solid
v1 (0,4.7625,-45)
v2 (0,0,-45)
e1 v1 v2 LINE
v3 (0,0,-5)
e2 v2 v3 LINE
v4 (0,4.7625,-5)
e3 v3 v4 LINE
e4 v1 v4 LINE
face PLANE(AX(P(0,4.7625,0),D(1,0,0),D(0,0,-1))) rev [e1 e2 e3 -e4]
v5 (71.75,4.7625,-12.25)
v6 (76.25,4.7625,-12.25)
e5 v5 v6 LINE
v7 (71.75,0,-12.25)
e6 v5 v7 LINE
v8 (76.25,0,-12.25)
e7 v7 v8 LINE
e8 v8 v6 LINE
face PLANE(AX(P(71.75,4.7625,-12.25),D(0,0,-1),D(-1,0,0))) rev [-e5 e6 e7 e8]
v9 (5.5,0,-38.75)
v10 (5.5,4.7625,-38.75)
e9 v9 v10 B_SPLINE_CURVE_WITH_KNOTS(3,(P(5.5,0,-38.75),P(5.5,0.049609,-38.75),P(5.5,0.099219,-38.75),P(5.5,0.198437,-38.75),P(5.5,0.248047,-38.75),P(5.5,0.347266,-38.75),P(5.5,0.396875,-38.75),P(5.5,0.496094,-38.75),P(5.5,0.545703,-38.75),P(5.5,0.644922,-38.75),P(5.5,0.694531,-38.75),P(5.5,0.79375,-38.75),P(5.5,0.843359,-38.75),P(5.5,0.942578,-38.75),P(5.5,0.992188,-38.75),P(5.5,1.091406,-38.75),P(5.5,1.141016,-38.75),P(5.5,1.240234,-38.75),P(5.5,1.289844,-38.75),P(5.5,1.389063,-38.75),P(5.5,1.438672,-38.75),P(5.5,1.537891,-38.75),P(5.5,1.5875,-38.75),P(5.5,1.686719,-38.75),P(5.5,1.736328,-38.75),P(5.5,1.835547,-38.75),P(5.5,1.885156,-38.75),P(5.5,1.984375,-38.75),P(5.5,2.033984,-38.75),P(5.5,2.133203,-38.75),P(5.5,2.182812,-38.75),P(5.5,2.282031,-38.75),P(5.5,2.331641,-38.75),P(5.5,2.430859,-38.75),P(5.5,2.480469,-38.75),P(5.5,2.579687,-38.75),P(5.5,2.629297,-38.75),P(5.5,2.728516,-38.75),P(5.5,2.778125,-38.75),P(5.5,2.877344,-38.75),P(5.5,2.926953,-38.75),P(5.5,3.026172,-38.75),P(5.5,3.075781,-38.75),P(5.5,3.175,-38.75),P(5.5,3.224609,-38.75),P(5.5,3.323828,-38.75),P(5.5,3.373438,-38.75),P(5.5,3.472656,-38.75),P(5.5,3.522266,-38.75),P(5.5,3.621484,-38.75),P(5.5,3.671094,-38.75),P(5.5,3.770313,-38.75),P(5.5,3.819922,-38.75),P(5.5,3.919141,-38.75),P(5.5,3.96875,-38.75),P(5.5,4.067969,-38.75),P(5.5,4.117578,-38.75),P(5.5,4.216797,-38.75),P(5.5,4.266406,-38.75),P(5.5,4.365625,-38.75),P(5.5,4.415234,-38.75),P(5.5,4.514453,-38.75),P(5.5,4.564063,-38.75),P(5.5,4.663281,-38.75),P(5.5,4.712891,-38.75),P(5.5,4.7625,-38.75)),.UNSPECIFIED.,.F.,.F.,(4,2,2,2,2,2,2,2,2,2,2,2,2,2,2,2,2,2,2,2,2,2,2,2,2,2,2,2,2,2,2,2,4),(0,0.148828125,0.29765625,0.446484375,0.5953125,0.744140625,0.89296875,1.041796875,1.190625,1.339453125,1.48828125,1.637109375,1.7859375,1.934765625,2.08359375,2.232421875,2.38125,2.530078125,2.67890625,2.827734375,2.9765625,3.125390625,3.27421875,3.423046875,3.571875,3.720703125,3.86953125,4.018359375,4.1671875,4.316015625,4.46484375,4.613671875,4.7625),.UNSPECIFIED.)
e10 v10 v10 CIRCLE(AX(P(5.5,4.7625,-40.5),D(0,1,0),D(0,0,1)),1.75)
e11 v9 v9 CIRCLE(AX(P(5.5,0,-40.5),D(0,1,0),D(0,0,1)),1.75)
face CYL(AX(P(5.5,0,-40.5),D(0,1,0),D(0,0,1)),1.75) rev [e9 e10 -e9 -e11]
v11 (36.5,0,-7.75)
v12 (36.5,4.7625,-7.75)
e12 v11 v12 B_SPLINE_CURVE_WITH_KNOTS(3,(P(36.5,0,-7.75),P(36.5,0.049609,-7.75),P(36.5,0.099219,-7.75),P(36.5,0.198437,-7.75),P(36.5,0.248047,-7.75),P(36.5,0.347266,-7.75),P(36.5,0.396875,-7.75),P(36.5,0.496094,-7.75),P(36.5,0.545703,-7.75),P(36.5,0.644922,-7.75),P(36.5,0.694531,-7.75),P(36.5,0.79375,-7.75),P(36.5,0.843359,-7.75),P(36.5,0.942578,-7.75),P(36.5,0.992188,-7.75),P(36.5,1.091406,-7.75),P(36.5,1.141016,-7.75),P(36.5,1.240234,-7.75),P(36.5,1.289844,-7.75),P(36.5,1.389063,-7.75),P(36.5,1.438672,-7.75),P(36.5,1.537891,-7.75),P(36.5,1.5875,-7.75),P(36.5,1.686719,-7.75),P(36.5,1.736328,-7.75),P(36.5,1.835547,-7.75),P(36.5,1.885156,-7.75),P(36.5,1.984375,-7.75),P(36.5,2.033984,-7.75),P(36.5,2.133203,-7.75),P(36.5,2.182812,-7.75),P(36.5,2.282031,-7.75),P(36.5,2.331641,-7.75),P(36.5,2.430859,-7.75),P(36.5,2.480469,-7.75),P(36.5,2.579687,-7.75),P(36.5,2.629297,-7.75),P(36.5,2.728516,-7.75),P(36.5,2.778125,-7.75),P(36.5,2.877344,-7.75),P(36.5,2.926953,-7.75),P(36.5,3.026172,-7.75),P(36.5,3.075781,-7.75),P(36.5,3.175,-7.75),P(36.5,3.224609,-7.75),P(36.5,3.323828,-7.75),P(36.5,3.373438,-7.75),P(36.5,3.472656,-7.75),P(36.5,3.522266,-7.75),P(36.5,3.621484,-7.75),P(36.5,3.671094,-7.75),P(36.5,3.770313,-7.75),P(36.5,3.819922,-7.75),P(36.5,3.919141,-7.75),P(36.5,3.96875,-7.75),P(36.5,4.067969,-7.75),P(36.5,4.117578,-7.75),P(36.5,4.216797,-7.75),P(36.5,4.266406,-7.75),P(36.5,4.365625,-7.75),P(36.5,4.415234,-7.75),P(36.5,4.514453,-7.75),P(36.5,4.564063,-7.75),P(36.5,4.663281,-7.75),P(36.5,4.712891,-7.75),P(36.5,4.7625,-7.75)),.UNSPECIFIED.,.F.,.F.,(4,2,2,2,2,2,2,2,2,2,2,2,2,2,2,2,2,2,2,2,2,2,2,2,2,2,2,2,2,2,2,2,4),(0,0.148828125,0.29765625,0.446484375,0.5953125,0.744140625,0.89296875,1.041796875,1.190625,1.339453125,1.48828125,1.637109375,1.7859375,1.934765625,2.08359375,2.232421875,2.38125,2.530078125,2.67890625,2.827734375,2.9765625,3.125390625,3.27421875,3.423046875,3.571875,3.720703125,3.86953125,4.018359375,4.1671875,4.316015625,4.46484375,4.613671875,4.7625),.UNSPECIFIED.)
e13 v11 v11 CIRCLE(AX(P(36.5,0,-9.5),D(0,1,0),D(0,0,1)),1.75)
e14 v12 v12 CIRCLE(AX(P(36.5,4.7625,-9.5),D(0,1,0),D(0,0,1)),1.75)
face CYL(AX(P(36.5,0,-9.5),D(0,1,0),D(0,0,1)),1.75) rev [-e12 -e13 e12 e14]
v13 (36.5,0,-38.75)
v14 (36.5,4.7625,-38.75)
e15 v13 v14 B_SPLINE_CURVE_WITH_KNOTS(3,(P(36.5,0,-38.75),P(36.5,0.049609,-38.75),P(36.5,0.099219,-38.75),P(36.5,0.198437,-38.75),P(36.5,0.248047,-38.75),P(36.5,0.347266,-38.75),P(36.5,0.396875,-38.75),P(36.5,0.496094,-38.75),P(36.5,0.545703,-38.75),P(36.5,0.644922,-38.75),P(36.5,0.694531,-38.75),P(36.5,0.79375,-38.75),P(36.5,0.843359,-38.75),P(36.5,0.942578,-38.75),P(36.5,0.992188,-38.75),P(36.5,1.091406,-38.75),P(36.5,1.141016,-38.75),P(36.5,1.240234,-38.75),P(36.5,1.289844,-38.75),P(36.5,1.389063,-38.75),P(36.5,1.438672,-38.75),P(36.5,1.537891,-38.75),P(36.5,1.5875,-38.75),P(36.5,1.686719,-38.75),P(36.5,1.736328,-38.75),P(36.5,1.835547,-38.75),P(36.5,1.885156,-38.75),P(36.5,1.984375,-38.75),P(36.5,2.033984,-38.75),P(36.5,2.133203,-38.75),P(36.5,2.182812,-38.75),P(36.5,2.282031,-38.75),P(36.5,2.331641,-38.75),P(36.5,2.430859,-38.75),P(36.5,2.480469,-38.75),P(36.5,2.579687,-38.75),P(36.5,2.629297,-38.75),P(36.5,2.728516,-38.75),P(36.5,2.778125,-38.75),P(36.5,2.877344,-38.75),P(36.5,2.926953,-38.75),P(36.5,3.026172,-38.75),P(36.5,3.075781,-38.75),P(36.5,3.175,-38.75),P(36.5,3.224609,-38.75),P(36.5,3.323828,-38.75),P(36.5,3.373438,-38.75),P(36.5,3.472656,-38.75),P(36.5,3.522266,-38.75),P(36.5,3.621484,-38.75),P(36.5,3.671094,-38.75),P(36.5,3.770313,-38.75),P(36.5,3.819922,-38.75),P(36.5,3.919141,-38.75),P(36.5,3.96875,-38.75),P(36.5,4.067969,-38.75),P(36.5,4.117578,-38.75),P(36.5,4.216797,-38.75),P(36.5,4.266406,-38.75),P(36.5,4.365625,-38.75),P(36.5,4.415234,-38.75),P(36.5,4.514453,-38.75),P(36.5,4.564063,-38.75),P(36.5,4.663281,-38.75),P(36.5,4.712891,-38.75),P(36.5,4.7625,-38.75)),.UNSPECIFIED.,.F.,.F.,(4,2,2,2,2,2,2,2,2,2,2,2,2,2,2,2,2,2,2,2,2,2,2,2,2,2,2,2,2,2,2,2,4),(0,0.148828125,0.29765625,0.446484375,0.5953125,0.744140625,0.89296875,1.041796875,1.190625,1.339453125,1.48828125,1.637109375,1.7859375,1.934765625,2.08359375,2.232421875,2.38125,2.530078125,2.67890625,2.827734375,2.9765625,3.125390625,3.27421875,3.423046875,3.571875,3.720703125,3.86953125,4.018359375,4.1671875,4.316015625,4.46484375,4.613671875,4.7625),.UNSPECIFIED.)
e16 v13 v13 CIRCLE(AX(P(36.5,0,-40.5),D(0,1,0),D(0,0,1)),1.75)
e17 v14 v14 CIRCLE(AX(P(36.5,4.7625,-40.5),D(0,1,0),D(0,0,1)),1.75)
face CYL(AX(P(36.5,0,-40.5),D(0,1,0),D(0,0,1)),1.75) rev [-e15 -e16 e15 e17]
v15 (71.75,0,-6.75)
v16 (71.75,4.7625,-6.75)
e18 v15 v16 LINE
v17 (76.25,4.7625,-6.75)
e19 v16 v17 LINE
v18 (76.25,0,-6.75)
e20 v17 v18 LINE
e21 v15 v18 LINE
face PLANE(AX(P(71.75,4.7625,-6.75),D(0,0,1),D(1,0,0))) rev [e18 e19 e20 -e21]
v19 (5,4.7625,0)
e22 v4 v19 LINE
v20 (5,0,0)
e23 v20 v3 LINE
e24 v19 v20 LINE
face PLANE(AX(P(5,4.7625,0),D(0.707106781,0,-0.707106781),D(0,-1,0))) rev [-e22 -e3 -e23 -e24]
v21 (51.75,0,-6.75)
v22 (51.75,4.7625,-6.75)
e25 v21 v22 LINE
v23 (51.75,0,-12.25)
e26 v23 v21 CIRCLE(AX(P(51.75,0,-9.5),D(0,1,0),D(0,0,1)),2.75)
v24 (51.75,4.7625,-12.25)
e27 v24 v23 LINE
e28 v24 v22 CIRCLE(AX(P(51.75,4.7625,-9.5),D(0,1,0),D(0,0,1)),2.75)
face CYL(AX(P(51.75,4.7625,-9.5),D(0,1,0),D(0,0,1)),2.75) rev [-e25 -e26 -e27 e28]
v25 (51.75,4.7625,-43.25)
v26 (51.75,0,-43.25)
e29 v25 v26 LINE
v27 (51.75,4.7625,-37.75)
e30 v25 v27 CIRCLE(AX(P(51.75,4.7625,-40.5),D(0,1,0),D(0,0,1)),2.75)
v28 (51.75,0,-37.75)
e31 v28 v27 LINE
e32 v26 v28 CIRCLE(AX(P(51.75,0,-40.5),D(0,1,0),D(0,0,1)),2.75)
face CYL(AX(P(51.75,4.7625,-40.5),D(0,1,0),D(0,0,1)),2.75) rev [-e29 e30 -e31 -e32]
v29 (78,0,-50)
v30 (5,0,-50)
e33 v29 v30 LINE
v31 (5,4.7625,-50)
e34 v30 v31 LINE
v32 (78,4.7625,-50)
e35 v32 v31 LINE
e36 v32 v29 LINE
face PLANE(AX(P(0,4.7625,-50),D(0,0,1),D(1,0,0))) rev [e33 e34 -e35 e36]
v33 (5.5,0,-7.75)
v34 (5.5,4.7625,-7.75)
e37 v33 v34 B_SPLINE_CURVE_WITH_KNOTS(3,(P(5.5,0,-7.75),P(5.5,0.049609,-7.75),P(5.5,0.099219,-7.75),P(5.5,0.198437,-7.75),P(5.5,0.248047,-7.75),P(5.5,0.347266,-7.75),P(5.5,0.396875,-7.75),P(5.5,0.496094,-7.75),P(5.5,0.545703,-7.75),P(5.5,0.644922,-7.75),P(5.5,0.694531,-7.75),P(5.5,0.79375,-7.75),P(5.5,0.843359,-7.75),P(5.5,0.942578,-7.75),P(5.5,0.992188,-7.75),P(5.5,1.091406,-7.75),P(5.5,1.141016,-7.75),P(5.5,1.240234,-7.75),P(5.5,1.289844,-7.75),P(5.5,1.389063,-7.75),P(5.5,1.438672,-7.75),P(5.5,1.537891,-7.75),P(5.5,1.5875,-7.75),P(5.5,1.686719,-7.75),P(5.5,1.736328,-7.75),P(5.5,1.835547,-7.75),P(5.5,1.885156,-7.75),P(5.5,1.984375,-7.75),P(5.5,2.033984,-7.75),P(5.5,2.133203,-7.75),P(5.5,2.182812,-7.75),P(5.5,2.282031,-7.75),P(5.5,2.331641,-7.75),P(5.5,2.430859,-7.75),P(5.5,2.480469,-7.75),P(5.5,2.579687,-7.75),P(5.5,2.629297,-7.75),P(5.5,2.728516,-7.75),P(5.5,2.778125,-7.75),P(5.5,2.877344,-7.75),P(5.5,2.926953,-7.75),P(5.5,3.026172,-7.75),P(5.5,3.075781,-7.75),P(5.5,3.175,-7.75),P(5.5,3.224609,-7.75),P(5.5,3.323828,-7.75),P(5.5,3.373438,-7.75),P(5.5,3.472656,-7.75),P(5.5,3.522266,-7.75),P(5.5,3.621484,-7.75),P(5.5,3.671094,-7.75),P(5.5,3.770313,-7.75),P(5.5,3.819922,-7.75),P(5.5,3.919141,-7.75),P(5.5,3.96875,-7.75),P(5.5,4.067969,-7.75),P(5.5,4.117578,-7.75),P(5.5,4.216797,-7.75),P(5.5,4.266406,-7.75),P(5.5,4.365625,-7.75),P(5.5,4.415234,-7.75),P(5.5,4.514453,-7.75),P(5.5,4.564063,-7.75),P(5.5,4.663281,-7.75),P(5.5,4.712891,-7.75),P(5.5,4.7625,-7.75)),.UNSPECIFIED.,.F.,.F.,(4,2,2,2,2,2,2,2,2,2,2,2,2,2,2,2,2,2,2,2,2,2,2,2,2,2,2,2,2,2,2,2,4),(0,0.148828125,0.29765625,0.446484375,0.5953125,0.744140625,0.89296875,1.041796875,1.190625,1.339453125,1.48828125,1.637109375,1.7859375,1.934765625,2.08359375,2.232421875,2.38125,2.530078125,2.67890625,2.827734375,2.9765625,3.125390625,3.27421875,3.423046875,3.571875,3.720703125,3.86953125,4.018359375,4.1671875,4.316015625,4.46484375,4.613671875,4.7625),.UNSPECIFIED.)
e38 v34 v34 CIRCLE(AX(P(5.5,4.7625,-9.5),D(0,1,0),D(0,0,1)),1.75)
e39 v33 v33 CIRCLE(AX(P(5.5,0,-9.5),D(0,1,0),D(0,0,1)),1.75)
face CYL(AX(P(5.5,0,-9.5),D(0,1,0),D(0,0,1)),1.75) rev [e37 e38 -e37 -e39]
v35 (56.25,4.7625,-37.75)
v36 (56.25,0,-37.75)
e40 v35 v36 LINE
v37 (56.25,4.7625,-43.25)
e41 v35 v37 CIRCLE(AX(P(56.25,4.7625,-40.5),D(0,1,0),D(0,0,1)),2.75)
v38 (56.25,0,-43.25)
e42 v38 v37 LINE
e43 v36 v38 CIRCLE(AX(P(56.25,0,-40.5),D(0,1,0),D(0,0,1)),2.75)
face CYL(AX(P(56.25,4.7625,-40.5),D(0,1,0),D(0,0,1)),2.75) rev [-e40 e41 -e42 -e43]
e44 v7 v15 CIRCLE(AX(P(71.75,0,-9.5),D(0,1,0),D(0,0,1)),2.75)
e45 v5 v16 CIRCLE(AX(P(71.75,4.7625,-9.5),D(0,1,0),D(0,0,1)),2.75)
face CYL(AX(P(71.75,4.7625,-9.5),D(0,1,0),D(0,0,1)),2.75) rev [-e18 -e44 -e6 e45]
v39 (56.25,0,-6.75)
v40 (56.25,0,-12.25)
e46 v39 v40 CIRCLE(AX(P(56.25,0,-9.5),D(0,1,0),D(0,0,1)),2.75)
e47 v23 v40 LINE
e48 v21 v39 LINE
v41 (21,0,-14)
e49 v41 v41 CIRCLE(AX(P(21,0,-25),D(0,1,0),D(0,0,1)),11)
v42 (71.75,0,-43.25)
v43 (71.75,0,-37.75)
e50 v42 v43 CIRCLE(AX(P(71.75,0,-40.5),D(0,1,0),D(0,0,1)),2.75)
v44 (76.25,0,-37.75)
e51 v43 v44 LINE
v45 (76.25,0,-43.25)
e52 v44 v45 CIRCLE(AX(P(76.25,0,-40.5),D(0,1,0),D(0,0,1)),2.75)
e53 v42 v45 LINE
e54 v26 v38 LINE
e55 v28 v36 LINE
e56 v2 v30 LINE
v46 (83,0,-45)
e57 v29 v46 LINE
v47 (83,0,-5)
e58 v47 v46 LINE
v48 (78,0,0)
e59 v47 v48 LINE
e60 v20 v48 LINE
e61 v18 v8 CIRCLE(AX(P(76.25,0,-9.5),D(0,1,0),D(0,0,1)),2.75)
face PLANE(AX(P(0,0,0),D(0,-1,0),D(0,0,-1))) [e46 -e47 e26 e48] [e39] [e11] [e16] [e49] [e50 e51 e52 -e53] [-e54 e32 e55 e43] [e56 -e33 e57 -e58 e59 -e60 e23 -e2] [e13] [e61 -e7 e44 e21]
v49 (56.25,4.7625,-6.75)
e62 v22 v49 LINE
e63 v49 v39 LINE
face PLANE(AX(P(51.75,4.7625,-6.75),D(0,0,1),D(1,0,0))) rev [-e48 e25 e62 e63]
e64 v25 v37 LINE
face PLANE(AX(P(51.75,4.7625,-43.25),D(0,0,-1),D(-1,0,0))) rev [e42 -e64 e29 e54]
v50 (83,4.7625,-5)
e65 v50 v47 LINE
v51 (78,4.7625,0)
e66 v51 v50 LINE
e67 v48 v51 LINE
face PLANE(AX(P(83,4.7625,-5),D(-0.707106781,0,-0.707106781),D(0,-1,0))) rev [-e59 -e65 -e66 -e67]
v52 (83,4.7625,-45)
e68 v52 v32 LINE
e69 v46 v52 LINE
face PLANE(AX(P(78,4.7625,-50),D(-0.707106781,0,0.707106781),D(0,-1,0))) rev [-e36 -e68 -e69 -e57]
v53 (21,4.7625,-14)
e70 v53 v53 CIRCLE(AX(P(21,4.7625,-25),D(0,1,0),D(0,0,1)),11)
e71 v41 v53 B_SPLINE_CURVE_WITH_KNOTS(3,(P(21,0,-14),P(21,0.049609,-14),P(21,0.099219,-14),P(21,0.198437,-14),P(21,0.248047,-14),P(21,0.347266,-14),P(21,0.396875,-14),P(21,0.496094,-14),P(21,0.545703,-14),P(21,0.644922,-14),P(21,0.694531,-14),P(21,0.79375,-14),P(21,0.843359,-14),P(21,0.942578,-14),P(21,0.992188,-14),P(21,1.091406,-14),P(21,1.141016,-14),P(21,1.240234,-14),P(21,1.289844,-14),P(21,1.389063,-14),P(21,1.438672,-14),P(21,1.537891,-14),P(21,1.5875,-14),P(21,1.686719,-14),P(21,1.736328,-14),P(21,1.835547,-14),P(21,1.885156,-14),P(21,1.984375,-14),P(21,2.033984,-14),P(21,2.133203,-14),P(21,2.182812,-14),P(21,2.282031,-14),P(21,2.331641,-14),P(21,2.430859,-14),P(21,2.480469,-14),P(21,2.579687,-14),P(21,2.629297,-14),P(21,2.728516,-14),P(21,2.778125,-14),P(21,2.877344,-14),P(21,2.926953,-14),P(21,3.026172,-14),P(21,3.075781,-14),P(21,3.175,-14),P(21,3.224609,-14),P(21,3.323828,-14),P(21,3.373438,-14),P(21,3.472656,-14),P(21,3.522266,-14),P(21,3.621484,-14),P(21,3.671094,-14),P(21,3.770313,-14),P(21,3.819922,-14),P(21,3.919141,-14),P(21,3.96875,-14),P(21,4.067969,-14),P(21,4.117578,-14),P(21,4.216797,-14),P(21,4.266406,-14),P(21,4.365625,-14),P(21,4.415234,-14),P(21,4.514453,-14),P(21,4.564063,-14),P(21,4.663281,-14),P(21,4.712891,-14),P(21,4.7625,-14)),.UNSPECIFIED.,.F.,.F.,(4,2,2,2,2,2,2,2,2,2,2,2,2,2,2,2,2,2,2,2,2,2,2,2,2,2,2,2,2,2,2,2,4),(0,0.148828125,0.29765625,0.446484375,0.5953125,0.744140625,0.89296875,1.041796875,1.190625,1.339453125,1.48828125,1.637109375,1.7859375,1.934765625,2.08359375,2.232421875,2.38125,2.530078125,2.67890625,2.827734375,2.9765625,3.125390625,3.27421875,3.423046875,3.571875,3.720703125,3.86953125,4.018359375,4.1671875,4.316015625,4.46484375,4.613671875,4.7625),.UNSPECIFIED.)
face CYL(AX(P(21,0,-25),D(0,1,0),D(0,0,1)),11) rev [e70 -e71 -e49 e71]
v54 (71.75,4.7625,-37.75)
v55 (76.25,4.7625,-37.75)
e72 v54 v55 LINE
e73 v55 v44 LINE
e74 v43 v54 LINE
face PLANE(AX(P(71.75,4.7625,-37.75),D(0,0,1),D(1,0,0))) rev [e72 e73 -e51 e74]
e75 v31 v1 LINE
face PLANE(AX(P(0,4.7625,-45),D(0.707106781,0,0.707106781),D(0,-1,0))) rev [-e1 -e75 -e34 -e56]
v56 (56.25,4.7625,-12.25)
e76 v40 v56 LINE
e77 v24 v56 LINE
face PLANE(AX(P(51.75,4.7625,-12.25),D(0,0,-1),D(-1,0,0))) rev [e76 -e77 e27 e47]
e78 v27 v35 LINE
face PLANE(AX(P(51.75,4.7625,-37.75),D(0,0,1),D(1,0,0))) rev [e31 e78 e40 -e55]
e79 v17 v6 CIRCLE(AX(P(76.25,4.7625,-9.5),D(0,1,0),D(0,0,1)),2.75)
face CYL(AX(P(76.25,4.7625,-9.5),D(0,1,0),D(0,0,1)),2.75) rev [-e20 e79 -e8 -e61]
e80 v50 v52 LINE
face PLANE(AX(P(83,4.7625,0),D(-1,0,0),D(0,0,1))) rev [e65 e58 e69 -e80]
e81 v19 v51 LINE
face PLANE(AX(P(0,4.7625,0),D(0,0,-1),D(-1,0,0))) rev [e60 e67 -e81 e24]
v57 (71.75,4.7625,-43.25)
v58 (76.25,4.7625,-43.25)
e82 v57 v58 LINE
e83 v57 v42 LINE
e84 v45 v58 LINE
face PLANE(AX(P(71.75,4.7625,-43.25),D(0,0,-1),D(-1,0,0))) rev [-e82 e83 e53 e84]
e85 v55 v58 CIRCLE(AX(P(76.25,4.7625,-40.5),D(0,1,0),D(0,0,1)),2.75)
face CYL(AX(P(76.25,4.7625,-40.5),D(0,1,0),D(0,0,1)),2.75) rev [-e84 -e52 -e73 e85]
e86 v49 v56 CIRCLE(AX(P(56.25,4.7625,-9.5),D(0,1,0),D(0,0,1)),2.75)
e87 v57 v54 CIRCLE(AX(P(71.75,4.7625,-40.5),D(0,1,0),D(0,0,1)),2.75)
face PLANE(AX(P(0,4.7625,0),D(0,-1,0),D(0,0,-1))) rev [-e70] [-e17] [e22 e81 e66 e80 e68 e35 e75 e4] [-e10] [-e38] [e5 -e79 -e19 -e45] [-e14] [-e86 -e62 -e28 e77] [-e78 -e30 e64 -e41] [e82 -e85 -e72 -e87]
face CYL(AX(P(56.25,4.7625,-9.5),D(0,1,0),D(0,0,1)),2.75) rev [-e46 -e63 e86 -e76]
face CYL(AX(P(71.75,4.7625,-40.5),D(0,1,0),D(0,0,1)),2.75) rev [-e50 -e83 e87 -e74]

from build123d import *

# Parameters (mm, degrees)
SKETCH1_W                = 83
SKETCH1_H                = 50
BOSS_EXTRUDE1_DEPTH      = 4.7625
SKETCH2_R                = 11
SKETCH2_R_2              = 1.75
CUT_EXTRUDE1_DEPTH       = 98.013820697
CHAMFER1_SIZE            = 5
M5_CLEARANCE_SLOT1_DEPTH = 4.7625


# Read off the part's stored shape, not the designer's step: M5 Clearance Slot1
with BuildPart() as part:
    # Sketch1 → Boss-Extrude1 (new body)
    with BuildSketch(Plane(origin=(0, 0, 0), x_dir=(1, 0, 0), z_dir=(0, 1, 0))):
        with Locations((41.5, 25)):
            Rectangle(SKETCH1_W, SKETCH1_H)
    extrude(amount=BOSS_EXTRUDE1_DEPTH)

    # Sketch2 → Cut-Extrude1 (cut, through all)
    with BuildSketch(Plane(origin=(0, 4.7625, 0), x_dir=(1, 0, 0), z_dir=(0, 1, 0))):
        with Locations(Location((21, 25, 0), (0, 0, 270))):
            Circle(SKETCH2_R)
        with Locations(Location((5.5, 9.5, 0), (0, 0, 270))):
            Circle(SKETCH2_R_2)
        with Locations(Location((36.5, 9.5, 0), (0, 0, 270))):
            Circle(SKETCH2_R_2)
        with Locations(Location((36.5, 40.5, 0), (0, 0, 270))):
            Circle(SKETCH2_R_2)
        with Locations(Location((5.5, 40.5, 0), (0, 0, 270))):
            Circle(SKETCH2_R_2)
    extrude(amount=-CUT_EXTRUDE1_DEPTH, mode=Mode.SUBTRACT)

    # Chamfer1
    chamfer1_edges = [part.edges().sort_by_distance(p)[0] for p in [
        (0, 2.38125, -50),
        (83, 2.38125, -50),
        (83, 2.38125, 0),
        (0, 2.38125, 0),
    ]]
    chamfer(chamfer1_edges, length=CHAMFER1_SIZE)

    # M5 Clearance Slot1 outline → M5 Clearance Slot1 (cut)
    with BuildSketch(Plane(origin=(0, 0, 0), x_dir=(1, 0, 0), z_dir=(0, 1, 0))):
        with BuildLine():
            Line((51.75, 6.75), (56.25, 6.75))
            ThreePointArc((56.25, 6.75), (59, 9.5), (56.25, 12.25))
            Line((56.25, 12.25), (51.75, 12.25))
            ThreePointArc((51.75, 12.25), (49, 9.5), (51.75, 6.75))
        make_face()
        with BuildLine():
            ThreePointArc((76.25, 6.75), (79, 9.5), (76.25, 12.25))
            Line((76.25, 12.25), (71.75, 12.25))
            ThreePointArc((71.75, 12.25), (69, 9.5), (71.75, 6.75))
            Line((71.75, 6.75), (76.25, 6.75))
        make_face()
        with BuildLine():
            Line((71.75, 37.75), (76.25, 37.75))
            ThreePointArc((76.25, 37.75), (79, 40.5), (76.25, 43.25))
            Line((76.25, 43.25), (71.75, 43.25))
            ThreePointArc((71.75, 43.25), (69, 40.5), (71.75, 37.75))
        make_face()
        with BuildLine():
            ThreePointArc((56.25, 37.75), (59, 40.5), (56.25, 43.25))
            Line((56.25, 43.25), (51.75, 43.25))
            ThreePointArc((51.75, 43.25), (49, 40.5), (51.75, 37.75))
            Line((51.75, 37.75), (56.25, 37.75))
        make_face()
    extrude(amount=M5_CLEARANCE_SLOT1_DEPTH, mode=Mode.SUBTRACT)


solid = part.part
